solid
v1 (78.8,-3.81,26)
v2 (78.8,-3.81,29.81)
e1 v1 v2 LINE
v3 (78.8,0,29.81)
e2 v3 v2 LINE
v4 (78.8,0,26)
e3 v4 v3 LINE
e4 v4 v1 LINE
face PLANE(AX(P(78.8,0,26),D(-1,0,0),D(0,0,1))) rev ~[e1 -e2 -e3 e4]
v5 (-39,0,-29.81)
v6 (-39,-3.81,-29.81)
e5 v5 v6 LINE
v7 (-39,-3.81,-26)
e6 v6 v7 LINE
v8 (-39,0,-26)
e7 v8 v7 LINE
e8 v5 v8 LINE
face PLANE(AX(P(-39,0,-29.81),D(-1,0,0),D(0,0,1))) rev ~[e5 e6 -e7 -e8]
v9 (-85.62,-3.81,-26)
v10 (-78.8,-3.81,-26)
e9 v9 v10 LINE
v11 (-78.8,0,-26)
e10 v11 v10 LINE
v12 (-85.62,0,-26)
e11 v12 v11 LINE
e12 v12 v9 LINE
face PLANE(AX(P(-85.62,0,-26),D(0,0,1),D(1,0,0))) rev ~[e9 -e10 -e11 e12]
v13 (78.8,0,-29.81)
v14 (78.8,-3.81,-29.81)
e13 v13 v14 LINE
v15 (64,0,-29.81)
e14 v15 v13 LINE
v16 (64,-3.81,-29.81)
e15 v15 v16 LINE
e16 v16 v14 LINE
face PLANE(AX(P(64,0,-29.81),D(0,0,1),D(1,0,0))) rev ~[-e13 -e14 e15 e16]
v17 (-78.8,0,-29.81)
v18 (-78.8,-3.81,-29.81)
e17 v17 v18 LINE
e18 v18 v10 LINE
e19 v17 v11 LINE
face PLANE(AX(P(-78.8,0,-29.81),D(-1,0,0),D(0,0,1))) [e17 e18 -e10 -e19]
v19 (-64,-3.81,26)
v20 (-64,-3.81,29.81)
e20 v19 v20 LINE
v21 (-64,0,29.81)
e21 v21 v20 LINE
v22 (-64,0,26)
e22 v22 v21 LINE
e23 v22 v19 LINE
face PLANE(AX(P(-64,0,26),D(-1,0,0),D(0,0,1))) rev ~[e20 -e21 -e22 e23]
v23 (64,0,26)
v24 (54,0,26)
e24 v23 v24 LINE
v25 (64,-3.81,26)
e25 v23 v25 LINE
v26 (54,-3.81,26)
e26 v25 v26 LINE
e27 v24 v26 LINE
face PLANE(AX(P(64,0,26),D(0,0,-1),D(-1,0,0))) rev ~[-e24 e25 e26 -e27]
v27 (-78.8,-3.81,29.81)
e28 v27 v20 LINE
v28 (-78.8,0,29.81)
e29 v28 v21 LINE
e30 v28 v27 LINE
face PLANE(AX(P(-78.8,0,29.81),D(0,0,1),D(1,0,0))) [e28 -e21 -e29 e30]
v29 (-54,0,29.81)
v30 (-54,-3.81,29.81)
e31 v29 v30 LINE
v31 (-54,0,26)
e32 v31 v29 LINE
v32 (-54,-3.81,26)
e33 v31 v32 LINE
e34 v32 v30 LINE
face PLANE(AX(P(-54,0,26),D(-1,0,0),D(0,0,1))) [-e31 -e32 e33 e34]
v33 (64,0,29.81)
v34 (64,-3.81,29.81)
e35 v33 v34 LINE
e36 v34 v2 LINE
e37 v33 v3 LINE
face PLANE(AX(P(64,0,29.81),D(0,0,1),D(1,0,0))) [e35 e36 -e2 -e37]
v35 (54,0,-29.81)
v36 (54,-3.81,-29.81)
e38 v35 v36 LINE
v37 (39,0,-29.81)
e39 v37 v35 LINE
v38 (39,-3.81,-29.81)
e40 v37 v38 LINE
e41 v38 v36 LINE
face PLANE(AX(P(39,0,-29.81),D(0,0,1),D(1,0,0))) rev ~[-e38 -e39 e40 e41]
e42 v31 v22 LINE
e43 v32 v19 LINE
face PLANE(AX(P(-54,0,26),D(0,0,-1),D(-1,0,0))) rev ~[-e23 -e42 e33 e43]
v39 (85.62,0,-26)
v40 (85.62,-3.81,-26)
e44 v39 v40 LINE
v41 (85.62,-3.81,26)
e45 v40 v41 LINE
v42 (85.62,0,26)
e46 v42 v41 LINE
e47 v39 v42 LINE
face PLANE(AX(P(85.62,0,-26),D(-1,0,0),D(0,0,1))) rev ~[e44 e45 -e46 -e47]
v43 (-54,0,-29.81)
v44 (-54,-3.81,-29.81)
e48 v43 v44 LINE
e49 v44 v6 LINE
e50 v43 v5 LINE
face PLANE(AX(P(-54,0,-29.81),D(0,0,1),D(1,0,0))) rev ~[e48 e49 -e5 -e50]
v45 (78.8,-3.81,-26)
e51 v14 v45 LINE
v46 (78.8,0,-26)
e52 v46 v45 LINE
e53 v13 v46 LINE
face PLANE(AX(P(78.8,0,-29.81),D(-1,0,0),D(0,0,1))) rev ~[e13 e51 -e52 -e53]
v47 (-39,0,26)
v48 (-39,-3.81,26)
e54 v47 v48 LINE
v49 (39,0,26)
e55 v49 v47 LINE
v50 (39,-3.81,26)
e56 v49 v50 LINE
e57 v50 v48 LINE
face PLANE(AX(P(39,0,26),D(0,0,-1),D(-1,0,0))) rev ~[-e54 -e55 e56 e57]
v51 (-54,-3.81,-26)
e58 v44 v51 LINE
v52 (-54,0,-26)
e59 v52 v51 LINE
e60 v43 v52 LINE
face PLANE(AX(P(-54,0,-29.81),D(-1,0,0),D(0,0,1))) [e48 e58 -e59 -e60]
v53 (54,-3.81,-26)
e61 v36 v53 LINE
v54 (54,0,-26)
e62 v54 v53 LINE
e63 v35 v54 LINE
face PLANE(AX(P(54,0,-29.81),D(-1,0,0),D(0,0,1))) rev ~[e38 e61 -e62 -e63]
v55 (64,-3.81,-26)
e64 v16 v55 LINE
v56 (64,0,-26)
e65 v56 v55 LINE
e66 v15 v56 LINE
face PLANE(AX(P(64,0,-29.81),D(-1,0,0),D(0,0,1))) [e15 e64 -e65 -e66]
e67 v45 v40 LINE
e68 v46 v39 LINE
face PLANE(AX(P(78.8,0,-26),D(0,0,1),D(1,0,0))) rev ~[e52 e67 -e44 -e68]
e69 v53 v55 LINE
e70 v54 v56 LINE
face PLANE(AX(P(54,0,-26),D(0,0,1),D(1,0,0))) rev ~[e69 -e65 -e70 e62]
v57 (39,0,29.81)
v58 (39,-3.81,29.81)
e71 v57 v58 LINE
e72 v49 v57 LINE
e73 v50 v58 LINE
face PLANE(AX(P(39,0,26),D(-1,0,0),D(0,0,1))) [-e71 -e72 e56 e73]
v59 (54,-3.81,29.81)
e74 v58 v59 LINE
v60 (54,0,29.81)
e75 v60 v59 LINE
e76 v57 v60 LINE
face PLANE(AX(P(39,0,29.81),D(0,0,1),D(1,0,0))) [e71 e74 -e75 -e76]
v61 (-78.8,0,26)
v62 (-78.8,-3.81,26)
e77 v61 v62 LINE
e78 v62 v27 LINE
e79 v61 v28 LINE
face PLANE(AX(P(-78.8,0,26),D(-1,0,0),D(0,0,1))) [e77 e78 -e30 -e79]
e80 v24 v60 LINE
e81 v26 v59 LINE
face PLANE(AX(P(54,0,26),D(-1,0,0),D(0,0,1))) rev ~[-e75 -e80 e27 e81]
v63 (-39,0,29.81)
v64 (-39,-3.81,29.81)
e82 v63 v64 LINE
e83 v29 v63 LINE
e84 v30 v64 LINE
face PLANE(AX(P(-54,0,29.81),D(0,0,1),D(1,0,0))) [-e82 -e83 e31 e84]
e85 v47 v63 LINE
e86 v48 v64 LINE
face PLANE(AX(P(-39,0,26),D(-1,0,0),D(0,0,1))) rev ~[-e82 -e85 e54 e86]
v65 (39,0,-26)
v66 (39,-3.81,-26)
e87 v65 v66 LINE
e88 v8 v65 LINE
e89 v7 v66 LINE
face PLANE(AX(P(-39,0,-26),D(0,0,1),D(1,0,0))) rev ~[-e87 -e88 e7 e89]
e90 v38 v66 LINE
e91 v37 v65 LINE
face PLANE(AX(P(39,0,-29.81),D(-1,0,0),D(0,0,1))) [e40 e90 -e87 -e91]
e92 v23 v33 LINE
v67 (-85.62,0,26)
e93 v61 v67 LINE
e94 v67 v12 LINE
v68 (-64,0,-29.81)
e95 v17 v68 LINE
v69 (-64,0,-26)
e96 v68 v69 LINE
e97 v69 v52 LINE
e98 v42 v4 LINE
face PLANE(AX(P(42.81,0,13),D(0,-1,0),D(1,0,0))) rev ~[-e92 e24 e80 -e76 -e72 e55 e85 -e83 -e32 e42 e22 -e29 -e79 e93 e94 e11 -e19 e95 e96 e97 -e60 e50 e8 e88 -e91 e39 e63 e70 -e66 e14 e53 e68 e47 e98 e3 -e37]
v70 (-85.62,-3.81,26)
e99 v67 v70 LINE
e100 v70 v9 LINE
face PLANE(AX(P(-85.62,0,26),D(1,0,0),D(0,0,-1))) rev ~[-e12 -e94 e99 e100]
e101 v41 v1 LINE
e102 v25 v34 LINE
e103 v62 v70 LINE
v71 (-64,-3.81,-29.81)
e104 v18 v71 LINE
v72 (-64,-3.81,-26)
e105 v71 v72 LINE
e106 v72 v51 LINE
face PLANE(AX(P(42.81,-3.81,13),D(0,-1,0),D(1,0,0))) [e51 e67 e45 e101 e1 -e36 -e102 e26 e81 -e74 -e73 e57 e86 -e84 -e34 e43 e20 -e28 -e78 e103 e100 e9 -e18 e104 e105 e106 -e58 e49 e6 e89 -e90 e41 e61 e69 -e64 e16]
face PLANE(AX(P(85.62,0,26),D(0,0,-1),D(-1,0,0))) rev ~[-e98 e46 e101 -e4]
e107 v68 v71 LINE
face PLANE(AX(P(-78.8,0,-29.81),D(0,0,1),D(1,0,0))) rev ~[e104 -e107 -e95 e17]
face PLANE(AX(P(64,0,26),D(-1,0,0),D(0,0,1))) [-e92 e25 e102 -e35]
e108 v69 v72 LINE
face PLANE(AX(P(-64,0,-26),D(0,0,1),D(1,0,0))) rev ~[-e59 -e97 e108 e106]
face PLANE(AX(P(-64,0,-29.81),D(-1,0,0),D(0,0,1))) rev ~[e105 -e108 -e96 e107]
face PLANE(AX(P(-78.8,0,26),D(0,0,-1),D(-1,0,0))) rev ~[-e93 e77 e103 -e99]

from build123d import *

# Parameters (mm, degrees)
F0_W     = 14.8
F0_H     = 3.81
F0_W_2   = 15
F1_DEPTH = 3.81


# Not quite as in the source:
# - a feature names something its author has since deleted; it is built from what else it names


with BuildPart() as f1:
    # F0 (on Front) → F1 (new body)
    with BuildSketch(Plane.XZ):
        Polygon((85.62, 0), (85.62, 26), (78.8, 26), (64, 26), (54, 26), (39, 26), (0, 26), (0, 0), align=None)
        Polygon((-85.62, 0), (0, 0), (0, 26), (-39, 26), (-54, 26), (-64, 26), (-78.8, 26), (-85.62, 26), align=None)
        Polygon((0, -26), (0, 0), (-85.62, 0), (-85.62, -26), (-78.8, -26), (-64, -26), (-54, -26), (-39, -26), align=None)
        Polygon((85.62, -26), (85.62, 0), (0, 0), (0, -26), (39, -26), (54, -26), (64, -26), (78.8, -26), align=None)
        with Locations((71.4, 27.905)):
            Rectangle(F0_W, F0_H)
        with Locations((-71.4, -27.905)):
            Rectangle(F0_W, F0_H)
        with Locations((-71.4, 27.905)):
            Rectangle(F0_W, F0_H)
        with Locations((71.4, -27.905)):
            Rectangle(F0_W, F0_H)
        with Locations((-46.5, 27.905)):
            Rectangle(F0_W_2, F0_H)
        with Locations((-46.5, -27.905)):
            Rectangle(F0_W_2, F0_H)
        with Locations((46.5, -27.905)):
            Rectangle(F0_W_2, F0_H)
        with Locations((46.5, 27.905)):
            Rectangle(F0_W_2, F0_H)
    extrude(amount=F1_DEPTH)


solid = f1.part
